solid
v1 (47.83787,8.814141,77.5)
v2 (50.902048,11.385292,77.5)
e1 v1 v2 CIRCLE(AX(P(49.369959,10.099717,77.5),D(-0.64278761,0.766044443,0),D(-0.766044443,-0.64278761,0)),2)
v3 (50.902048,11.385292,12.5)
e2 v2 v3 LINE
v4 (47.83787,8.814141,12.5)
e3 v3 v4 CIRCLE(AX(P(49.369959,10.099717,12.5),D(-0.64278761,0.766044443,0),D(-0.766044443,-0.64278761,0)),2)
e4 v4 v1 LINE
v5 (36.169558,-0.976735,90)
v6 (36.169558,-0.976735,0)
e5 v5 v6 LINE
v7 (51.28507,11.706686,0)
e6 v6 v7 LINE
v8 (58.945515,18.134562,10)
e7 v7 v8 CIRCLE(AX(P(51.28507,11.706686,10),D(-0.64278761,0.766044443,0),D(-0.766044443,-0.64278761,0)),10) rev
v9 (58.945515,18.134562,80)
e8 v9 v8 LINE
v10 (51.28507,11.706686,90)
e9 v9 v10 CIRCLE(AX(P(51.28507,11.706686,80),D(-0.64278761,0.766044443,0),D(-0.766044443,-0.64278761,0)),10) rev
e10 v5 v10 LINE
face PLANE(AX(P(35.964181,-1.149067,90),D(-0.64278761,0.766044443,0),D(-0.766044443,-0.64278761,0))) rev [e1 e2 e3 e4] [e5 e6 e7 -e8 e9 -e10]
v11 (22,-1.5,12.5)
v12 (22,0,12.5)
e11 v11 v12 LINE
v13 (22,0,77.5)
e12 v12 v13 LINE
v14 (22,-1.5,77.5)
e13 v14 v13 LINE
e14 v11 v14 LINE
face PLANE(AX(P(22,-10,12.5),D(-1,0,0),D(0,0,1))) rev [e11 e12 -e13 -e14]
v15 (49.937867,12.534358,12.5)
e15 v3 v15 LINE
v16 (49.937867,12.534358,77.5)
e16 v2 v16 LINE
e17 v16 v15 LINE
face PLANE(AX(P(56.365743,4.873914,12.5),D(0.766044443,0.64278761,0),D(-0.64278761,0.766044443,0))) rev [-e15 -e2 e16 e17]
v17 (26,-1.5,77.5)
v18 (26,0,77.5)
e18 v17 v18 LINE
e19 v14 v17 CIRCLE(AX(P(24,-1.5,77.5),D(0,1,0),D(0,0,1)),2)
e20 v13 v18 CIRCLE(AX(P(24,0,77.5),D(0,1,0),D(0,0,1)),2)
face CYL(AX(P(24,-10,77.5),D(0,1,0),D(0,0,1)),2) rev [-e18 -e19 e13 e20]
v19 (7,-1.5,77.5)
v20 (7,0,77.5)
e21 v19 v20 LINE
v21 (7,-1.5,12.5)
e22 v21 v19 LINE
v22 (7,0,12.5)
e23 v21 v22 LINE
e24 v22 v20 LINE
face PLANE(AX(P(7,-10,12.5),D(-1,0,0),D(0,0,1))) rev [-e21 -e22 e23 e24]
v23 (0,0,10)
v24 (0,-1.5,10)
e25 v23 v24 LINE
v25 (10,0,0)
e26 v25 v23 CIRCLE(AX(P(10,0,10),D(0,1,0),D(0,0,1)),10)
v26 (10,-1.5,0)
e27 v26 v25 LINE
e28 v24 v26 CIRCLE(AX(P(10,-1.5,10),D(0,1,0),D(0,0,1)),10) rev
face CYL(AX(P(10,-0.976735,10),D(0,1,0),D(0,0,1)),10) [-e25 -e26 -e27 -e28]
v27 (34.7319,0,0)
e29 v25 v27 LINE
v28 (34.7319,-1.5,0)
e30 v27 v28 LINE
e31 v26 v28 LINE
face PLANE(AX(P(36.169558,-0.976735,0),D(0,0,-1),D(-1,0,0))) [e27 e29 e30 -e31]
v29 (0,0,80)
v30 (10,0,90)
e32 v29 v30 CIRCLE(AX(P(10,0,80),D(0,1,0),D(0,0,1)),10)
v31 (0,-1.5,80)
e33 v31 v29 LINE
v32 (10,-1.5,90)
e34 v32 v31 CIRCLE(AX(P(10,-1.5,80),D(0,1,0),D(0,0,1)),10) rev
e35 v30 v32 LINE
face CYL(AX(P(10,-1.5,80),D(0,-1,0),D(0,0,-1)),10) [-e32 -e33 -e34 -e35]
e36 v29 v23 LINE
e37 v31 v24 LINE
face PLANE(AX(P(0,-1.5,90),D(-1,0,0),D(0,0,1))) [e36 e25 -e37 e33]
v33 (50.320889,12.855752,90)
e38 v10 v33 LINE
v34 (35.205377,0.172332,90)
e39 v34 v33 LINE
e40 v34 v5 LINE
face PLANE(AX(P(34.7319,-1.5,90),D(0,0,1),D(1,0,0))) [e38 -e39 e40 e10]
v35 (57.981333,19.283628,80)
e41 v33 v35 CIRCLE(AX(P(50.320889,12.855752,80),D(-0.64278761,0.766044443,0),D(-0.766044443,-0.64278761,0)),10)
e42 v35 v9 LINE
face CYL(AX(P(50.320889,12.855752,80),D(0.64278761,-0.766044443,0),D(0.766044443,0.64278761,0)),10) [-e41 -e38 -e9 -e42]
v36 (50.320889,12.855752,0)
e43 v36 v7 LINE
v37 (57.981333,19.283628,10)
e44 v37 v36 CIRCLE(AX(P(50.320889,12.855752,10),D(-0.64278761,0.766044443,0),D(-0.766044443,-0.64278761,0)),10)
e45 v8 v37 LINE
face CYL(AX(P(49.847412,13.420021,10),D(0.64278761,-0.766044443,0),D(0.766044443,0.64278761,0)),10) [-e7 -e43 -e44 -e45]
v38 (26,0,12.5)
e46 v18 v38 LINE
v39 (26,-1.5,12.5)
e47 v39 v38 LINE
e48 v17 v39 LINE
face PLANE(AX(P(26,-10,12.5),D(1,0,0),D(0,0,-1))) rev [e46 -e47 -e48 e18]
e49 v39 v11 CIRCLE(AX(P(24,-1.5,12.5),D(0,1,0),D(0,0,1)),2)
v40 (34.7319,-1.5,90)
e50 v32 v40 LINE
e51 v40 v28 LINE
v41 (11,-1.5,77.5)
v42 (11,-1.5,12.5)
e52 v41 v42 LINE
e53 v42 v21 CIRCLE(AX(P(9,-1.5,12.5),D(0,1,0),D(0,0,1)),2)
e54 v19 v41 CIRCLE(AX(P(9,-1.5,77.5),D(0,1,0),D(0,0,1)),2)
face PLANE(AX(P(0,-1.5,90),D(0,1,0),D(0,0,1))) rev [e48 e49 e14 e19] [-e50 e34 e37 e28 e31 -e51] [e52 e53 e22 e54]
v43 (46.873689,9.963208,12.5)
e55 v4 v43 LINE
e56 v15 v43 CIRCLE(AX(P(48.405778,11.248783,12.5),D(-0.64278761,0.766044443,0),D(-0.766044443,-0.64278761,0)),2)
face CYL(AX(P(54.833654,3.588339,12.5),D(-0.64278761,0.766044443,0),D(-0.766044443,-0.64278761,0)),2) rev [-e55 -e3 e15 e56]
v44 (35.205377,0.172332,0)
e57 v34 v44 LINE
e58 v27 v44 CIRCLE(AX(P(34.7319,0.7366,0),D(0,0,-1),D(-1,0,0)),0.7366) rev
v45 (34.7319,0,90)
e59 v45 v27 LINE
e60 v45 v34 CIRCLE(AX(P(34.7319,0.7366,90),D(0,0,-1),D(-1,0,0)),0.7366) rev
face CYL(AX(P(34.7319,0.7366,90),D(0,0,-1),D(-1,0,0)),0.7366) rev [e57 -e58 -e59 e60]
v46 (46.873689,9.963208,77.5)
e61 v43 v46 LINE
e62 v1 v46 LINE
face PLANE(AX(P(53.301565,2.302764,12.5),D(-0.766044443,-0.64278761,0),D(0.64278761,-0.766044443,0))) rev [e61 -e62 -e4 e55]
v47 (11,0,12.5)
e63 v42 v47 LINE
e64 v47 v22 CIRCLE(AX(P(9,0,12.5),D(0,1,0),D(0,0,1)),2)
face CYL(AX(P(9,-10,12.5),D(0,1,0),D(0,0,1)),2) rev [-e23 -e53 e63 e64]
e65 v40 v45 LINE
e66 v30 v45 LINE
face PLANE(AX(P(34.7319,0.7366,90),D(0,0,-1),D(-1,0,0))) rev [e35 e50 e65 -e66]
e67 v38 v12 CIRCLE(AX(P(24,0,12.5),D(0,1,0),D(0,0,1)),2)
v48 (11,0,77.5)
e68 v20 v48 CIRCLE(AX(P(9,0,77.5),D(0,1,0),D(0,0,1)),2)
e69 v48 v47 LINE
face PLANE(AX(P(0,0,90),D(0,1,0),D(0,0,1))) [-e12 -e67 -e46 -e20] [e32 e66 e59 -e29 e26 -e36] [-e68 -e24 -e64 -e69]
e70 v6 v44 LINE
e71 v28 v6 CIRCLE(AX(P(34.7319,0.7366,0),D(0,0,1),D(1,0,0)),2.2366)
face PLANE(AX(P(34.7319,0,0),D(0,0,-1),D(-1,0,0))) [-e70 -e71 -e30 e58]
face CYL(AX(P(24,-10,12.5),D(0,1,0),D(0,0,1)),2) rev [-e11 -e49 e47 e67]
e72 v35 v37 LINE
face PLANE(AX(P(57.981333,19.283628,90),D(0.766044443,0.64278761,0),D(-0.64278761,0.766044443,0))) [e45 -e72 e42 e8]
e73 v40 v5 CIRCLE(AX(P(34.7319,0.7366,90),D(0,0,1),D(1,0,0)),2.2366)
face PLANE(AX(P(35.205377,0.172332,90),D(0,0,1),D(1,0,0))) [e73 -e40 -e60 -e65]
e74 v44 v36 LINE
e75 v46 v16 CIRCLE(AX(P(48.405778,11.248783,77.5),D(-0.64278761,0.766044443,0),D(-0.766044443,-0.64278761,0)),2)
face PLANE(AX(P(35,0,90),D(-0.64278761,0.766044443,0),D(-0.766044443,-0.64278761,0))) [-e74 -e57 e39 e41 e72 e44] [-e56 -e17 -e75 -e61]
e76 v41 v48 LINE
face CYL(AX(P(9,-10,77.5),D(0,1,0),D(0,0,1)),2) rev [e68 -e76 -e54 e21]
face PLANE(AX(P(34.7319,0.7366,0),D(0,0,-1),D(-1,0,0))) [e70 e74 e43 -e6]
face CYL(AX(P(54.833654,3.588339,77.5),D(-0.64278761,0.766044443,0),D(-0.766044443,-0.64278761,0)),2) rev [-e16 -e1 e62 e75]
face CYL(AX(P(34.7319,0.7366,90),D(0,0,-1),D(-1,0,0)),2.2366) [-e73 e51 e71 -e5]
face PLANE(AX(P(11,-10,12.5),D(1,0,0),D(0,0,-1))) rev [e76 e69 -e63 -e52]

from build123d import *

# Parameters (mm, degrees)
SM_BASE_FLANGE_1_DEPTH = 90
CUT_EXTRUDE_1_DEPTH    = 10
CUT_EXTRUDE_2_DEPTH    = 10
FILLET_1_R             = 10


# Sheet-metal steps are written as plain solids
with BuildPart() as part:
    # Sketch 1 → 基体-法兰1 (new body)
    with BuildSketch(Plane.XY):
        with BuildLine():
            Line((0, 0), (34.731899525, 0))
            ThreePointArc((34.731899525, 0), (34.983831563, 0.044422416), (35.205376879, 0.172331663))
            Line((35.205376879, 0.172331663), (57.981333294, 19.283628291))
            Line((57.981333294, 19.283628291), (58.945514708, 18.134561626))
            Line((58.945514708, 18.134561626), (36.169558293, -0.976735001))
            ThreePointArc((36.169558293, -0.976735001), (35.496861778, -1.365116516), (34.731899525, -1.5))
            Line((34.731899525, -1.5), (0, -1.5))
            Line((0, -1.5), (0, 0))
        make_face()
    extrude(amount=SM_BASE_FLANGE_1_DEPTH)

    # 草图6 → 切除-拉伸1 (cut)
    with BuildSketch(Plane(origin=(0, 0, 0), x_dir=(1, 0, 0), z_dir=(0, 1, 0))):
        with BuildLine():
            Line((11, -12.5), (11, -77.5))
            ThreePointArc((11, -77.5), (9, -79.5), (7, -77.5))
            Line((7, -77.5), (7, -12.5))
            ThreePointArc((7, -12.5), (9, -10.5), (11, -12.5))
        make_face()
        with BuildLine():
            Line((26, -12.5), (26, -77.5))
            ThreePointArc((26, -77.5), (24, -79.5), (22, -77.5))
            Line((22, -77.5), (22, -12.5))
            ThreePointArc((22, -12.5), (24, -10.5), (26, -12.5))
        make_face()
    extrude(amount=-CUT_EXTRUDE_1_DEPTH, mode=Mode.SUBTRACT)

    # 草图7 → 切除-拉伸2 (cut)
    with BuildSketch(Plane(origin=(14.461156891, -17.234135678, 0), x_dir=(0, 0, 1), z_dir=(-0.6427876096865403, 0.7660444431189772, 0))):
        with BuildLine():
            Line((12.5, 46.311555509), (77.5, 46.311555509))
            ThreePointArc((77.5, 46.311555509), (79.5, 44.311555509), (77.5, 42.311555509))
            Line((77.5, 42.311555509), (12.5, 42.311555509))
            ThreePointArc((12.5, 42.311555509), (10.5, 44.311555509), (12.5, 46.311555509))
        make_face()
    extrude(amount=-CUT_EXTRUDE_2_DEPTH, mode=Mode.SUBTRACT)

    # 圆角1
    fillet_1_edges = [part.edges().sort_by_distance(p)[0] for p in [
        (0, -0.75, 90),
        (0, -0.75, 0),
        (58.463424001, 18.709094958, 90),
        (58.463424001, 18.709094958, 0),
    ]]
    fillet(fillet_1_edges, radius=FILLET_1_R)


solid = part.part
